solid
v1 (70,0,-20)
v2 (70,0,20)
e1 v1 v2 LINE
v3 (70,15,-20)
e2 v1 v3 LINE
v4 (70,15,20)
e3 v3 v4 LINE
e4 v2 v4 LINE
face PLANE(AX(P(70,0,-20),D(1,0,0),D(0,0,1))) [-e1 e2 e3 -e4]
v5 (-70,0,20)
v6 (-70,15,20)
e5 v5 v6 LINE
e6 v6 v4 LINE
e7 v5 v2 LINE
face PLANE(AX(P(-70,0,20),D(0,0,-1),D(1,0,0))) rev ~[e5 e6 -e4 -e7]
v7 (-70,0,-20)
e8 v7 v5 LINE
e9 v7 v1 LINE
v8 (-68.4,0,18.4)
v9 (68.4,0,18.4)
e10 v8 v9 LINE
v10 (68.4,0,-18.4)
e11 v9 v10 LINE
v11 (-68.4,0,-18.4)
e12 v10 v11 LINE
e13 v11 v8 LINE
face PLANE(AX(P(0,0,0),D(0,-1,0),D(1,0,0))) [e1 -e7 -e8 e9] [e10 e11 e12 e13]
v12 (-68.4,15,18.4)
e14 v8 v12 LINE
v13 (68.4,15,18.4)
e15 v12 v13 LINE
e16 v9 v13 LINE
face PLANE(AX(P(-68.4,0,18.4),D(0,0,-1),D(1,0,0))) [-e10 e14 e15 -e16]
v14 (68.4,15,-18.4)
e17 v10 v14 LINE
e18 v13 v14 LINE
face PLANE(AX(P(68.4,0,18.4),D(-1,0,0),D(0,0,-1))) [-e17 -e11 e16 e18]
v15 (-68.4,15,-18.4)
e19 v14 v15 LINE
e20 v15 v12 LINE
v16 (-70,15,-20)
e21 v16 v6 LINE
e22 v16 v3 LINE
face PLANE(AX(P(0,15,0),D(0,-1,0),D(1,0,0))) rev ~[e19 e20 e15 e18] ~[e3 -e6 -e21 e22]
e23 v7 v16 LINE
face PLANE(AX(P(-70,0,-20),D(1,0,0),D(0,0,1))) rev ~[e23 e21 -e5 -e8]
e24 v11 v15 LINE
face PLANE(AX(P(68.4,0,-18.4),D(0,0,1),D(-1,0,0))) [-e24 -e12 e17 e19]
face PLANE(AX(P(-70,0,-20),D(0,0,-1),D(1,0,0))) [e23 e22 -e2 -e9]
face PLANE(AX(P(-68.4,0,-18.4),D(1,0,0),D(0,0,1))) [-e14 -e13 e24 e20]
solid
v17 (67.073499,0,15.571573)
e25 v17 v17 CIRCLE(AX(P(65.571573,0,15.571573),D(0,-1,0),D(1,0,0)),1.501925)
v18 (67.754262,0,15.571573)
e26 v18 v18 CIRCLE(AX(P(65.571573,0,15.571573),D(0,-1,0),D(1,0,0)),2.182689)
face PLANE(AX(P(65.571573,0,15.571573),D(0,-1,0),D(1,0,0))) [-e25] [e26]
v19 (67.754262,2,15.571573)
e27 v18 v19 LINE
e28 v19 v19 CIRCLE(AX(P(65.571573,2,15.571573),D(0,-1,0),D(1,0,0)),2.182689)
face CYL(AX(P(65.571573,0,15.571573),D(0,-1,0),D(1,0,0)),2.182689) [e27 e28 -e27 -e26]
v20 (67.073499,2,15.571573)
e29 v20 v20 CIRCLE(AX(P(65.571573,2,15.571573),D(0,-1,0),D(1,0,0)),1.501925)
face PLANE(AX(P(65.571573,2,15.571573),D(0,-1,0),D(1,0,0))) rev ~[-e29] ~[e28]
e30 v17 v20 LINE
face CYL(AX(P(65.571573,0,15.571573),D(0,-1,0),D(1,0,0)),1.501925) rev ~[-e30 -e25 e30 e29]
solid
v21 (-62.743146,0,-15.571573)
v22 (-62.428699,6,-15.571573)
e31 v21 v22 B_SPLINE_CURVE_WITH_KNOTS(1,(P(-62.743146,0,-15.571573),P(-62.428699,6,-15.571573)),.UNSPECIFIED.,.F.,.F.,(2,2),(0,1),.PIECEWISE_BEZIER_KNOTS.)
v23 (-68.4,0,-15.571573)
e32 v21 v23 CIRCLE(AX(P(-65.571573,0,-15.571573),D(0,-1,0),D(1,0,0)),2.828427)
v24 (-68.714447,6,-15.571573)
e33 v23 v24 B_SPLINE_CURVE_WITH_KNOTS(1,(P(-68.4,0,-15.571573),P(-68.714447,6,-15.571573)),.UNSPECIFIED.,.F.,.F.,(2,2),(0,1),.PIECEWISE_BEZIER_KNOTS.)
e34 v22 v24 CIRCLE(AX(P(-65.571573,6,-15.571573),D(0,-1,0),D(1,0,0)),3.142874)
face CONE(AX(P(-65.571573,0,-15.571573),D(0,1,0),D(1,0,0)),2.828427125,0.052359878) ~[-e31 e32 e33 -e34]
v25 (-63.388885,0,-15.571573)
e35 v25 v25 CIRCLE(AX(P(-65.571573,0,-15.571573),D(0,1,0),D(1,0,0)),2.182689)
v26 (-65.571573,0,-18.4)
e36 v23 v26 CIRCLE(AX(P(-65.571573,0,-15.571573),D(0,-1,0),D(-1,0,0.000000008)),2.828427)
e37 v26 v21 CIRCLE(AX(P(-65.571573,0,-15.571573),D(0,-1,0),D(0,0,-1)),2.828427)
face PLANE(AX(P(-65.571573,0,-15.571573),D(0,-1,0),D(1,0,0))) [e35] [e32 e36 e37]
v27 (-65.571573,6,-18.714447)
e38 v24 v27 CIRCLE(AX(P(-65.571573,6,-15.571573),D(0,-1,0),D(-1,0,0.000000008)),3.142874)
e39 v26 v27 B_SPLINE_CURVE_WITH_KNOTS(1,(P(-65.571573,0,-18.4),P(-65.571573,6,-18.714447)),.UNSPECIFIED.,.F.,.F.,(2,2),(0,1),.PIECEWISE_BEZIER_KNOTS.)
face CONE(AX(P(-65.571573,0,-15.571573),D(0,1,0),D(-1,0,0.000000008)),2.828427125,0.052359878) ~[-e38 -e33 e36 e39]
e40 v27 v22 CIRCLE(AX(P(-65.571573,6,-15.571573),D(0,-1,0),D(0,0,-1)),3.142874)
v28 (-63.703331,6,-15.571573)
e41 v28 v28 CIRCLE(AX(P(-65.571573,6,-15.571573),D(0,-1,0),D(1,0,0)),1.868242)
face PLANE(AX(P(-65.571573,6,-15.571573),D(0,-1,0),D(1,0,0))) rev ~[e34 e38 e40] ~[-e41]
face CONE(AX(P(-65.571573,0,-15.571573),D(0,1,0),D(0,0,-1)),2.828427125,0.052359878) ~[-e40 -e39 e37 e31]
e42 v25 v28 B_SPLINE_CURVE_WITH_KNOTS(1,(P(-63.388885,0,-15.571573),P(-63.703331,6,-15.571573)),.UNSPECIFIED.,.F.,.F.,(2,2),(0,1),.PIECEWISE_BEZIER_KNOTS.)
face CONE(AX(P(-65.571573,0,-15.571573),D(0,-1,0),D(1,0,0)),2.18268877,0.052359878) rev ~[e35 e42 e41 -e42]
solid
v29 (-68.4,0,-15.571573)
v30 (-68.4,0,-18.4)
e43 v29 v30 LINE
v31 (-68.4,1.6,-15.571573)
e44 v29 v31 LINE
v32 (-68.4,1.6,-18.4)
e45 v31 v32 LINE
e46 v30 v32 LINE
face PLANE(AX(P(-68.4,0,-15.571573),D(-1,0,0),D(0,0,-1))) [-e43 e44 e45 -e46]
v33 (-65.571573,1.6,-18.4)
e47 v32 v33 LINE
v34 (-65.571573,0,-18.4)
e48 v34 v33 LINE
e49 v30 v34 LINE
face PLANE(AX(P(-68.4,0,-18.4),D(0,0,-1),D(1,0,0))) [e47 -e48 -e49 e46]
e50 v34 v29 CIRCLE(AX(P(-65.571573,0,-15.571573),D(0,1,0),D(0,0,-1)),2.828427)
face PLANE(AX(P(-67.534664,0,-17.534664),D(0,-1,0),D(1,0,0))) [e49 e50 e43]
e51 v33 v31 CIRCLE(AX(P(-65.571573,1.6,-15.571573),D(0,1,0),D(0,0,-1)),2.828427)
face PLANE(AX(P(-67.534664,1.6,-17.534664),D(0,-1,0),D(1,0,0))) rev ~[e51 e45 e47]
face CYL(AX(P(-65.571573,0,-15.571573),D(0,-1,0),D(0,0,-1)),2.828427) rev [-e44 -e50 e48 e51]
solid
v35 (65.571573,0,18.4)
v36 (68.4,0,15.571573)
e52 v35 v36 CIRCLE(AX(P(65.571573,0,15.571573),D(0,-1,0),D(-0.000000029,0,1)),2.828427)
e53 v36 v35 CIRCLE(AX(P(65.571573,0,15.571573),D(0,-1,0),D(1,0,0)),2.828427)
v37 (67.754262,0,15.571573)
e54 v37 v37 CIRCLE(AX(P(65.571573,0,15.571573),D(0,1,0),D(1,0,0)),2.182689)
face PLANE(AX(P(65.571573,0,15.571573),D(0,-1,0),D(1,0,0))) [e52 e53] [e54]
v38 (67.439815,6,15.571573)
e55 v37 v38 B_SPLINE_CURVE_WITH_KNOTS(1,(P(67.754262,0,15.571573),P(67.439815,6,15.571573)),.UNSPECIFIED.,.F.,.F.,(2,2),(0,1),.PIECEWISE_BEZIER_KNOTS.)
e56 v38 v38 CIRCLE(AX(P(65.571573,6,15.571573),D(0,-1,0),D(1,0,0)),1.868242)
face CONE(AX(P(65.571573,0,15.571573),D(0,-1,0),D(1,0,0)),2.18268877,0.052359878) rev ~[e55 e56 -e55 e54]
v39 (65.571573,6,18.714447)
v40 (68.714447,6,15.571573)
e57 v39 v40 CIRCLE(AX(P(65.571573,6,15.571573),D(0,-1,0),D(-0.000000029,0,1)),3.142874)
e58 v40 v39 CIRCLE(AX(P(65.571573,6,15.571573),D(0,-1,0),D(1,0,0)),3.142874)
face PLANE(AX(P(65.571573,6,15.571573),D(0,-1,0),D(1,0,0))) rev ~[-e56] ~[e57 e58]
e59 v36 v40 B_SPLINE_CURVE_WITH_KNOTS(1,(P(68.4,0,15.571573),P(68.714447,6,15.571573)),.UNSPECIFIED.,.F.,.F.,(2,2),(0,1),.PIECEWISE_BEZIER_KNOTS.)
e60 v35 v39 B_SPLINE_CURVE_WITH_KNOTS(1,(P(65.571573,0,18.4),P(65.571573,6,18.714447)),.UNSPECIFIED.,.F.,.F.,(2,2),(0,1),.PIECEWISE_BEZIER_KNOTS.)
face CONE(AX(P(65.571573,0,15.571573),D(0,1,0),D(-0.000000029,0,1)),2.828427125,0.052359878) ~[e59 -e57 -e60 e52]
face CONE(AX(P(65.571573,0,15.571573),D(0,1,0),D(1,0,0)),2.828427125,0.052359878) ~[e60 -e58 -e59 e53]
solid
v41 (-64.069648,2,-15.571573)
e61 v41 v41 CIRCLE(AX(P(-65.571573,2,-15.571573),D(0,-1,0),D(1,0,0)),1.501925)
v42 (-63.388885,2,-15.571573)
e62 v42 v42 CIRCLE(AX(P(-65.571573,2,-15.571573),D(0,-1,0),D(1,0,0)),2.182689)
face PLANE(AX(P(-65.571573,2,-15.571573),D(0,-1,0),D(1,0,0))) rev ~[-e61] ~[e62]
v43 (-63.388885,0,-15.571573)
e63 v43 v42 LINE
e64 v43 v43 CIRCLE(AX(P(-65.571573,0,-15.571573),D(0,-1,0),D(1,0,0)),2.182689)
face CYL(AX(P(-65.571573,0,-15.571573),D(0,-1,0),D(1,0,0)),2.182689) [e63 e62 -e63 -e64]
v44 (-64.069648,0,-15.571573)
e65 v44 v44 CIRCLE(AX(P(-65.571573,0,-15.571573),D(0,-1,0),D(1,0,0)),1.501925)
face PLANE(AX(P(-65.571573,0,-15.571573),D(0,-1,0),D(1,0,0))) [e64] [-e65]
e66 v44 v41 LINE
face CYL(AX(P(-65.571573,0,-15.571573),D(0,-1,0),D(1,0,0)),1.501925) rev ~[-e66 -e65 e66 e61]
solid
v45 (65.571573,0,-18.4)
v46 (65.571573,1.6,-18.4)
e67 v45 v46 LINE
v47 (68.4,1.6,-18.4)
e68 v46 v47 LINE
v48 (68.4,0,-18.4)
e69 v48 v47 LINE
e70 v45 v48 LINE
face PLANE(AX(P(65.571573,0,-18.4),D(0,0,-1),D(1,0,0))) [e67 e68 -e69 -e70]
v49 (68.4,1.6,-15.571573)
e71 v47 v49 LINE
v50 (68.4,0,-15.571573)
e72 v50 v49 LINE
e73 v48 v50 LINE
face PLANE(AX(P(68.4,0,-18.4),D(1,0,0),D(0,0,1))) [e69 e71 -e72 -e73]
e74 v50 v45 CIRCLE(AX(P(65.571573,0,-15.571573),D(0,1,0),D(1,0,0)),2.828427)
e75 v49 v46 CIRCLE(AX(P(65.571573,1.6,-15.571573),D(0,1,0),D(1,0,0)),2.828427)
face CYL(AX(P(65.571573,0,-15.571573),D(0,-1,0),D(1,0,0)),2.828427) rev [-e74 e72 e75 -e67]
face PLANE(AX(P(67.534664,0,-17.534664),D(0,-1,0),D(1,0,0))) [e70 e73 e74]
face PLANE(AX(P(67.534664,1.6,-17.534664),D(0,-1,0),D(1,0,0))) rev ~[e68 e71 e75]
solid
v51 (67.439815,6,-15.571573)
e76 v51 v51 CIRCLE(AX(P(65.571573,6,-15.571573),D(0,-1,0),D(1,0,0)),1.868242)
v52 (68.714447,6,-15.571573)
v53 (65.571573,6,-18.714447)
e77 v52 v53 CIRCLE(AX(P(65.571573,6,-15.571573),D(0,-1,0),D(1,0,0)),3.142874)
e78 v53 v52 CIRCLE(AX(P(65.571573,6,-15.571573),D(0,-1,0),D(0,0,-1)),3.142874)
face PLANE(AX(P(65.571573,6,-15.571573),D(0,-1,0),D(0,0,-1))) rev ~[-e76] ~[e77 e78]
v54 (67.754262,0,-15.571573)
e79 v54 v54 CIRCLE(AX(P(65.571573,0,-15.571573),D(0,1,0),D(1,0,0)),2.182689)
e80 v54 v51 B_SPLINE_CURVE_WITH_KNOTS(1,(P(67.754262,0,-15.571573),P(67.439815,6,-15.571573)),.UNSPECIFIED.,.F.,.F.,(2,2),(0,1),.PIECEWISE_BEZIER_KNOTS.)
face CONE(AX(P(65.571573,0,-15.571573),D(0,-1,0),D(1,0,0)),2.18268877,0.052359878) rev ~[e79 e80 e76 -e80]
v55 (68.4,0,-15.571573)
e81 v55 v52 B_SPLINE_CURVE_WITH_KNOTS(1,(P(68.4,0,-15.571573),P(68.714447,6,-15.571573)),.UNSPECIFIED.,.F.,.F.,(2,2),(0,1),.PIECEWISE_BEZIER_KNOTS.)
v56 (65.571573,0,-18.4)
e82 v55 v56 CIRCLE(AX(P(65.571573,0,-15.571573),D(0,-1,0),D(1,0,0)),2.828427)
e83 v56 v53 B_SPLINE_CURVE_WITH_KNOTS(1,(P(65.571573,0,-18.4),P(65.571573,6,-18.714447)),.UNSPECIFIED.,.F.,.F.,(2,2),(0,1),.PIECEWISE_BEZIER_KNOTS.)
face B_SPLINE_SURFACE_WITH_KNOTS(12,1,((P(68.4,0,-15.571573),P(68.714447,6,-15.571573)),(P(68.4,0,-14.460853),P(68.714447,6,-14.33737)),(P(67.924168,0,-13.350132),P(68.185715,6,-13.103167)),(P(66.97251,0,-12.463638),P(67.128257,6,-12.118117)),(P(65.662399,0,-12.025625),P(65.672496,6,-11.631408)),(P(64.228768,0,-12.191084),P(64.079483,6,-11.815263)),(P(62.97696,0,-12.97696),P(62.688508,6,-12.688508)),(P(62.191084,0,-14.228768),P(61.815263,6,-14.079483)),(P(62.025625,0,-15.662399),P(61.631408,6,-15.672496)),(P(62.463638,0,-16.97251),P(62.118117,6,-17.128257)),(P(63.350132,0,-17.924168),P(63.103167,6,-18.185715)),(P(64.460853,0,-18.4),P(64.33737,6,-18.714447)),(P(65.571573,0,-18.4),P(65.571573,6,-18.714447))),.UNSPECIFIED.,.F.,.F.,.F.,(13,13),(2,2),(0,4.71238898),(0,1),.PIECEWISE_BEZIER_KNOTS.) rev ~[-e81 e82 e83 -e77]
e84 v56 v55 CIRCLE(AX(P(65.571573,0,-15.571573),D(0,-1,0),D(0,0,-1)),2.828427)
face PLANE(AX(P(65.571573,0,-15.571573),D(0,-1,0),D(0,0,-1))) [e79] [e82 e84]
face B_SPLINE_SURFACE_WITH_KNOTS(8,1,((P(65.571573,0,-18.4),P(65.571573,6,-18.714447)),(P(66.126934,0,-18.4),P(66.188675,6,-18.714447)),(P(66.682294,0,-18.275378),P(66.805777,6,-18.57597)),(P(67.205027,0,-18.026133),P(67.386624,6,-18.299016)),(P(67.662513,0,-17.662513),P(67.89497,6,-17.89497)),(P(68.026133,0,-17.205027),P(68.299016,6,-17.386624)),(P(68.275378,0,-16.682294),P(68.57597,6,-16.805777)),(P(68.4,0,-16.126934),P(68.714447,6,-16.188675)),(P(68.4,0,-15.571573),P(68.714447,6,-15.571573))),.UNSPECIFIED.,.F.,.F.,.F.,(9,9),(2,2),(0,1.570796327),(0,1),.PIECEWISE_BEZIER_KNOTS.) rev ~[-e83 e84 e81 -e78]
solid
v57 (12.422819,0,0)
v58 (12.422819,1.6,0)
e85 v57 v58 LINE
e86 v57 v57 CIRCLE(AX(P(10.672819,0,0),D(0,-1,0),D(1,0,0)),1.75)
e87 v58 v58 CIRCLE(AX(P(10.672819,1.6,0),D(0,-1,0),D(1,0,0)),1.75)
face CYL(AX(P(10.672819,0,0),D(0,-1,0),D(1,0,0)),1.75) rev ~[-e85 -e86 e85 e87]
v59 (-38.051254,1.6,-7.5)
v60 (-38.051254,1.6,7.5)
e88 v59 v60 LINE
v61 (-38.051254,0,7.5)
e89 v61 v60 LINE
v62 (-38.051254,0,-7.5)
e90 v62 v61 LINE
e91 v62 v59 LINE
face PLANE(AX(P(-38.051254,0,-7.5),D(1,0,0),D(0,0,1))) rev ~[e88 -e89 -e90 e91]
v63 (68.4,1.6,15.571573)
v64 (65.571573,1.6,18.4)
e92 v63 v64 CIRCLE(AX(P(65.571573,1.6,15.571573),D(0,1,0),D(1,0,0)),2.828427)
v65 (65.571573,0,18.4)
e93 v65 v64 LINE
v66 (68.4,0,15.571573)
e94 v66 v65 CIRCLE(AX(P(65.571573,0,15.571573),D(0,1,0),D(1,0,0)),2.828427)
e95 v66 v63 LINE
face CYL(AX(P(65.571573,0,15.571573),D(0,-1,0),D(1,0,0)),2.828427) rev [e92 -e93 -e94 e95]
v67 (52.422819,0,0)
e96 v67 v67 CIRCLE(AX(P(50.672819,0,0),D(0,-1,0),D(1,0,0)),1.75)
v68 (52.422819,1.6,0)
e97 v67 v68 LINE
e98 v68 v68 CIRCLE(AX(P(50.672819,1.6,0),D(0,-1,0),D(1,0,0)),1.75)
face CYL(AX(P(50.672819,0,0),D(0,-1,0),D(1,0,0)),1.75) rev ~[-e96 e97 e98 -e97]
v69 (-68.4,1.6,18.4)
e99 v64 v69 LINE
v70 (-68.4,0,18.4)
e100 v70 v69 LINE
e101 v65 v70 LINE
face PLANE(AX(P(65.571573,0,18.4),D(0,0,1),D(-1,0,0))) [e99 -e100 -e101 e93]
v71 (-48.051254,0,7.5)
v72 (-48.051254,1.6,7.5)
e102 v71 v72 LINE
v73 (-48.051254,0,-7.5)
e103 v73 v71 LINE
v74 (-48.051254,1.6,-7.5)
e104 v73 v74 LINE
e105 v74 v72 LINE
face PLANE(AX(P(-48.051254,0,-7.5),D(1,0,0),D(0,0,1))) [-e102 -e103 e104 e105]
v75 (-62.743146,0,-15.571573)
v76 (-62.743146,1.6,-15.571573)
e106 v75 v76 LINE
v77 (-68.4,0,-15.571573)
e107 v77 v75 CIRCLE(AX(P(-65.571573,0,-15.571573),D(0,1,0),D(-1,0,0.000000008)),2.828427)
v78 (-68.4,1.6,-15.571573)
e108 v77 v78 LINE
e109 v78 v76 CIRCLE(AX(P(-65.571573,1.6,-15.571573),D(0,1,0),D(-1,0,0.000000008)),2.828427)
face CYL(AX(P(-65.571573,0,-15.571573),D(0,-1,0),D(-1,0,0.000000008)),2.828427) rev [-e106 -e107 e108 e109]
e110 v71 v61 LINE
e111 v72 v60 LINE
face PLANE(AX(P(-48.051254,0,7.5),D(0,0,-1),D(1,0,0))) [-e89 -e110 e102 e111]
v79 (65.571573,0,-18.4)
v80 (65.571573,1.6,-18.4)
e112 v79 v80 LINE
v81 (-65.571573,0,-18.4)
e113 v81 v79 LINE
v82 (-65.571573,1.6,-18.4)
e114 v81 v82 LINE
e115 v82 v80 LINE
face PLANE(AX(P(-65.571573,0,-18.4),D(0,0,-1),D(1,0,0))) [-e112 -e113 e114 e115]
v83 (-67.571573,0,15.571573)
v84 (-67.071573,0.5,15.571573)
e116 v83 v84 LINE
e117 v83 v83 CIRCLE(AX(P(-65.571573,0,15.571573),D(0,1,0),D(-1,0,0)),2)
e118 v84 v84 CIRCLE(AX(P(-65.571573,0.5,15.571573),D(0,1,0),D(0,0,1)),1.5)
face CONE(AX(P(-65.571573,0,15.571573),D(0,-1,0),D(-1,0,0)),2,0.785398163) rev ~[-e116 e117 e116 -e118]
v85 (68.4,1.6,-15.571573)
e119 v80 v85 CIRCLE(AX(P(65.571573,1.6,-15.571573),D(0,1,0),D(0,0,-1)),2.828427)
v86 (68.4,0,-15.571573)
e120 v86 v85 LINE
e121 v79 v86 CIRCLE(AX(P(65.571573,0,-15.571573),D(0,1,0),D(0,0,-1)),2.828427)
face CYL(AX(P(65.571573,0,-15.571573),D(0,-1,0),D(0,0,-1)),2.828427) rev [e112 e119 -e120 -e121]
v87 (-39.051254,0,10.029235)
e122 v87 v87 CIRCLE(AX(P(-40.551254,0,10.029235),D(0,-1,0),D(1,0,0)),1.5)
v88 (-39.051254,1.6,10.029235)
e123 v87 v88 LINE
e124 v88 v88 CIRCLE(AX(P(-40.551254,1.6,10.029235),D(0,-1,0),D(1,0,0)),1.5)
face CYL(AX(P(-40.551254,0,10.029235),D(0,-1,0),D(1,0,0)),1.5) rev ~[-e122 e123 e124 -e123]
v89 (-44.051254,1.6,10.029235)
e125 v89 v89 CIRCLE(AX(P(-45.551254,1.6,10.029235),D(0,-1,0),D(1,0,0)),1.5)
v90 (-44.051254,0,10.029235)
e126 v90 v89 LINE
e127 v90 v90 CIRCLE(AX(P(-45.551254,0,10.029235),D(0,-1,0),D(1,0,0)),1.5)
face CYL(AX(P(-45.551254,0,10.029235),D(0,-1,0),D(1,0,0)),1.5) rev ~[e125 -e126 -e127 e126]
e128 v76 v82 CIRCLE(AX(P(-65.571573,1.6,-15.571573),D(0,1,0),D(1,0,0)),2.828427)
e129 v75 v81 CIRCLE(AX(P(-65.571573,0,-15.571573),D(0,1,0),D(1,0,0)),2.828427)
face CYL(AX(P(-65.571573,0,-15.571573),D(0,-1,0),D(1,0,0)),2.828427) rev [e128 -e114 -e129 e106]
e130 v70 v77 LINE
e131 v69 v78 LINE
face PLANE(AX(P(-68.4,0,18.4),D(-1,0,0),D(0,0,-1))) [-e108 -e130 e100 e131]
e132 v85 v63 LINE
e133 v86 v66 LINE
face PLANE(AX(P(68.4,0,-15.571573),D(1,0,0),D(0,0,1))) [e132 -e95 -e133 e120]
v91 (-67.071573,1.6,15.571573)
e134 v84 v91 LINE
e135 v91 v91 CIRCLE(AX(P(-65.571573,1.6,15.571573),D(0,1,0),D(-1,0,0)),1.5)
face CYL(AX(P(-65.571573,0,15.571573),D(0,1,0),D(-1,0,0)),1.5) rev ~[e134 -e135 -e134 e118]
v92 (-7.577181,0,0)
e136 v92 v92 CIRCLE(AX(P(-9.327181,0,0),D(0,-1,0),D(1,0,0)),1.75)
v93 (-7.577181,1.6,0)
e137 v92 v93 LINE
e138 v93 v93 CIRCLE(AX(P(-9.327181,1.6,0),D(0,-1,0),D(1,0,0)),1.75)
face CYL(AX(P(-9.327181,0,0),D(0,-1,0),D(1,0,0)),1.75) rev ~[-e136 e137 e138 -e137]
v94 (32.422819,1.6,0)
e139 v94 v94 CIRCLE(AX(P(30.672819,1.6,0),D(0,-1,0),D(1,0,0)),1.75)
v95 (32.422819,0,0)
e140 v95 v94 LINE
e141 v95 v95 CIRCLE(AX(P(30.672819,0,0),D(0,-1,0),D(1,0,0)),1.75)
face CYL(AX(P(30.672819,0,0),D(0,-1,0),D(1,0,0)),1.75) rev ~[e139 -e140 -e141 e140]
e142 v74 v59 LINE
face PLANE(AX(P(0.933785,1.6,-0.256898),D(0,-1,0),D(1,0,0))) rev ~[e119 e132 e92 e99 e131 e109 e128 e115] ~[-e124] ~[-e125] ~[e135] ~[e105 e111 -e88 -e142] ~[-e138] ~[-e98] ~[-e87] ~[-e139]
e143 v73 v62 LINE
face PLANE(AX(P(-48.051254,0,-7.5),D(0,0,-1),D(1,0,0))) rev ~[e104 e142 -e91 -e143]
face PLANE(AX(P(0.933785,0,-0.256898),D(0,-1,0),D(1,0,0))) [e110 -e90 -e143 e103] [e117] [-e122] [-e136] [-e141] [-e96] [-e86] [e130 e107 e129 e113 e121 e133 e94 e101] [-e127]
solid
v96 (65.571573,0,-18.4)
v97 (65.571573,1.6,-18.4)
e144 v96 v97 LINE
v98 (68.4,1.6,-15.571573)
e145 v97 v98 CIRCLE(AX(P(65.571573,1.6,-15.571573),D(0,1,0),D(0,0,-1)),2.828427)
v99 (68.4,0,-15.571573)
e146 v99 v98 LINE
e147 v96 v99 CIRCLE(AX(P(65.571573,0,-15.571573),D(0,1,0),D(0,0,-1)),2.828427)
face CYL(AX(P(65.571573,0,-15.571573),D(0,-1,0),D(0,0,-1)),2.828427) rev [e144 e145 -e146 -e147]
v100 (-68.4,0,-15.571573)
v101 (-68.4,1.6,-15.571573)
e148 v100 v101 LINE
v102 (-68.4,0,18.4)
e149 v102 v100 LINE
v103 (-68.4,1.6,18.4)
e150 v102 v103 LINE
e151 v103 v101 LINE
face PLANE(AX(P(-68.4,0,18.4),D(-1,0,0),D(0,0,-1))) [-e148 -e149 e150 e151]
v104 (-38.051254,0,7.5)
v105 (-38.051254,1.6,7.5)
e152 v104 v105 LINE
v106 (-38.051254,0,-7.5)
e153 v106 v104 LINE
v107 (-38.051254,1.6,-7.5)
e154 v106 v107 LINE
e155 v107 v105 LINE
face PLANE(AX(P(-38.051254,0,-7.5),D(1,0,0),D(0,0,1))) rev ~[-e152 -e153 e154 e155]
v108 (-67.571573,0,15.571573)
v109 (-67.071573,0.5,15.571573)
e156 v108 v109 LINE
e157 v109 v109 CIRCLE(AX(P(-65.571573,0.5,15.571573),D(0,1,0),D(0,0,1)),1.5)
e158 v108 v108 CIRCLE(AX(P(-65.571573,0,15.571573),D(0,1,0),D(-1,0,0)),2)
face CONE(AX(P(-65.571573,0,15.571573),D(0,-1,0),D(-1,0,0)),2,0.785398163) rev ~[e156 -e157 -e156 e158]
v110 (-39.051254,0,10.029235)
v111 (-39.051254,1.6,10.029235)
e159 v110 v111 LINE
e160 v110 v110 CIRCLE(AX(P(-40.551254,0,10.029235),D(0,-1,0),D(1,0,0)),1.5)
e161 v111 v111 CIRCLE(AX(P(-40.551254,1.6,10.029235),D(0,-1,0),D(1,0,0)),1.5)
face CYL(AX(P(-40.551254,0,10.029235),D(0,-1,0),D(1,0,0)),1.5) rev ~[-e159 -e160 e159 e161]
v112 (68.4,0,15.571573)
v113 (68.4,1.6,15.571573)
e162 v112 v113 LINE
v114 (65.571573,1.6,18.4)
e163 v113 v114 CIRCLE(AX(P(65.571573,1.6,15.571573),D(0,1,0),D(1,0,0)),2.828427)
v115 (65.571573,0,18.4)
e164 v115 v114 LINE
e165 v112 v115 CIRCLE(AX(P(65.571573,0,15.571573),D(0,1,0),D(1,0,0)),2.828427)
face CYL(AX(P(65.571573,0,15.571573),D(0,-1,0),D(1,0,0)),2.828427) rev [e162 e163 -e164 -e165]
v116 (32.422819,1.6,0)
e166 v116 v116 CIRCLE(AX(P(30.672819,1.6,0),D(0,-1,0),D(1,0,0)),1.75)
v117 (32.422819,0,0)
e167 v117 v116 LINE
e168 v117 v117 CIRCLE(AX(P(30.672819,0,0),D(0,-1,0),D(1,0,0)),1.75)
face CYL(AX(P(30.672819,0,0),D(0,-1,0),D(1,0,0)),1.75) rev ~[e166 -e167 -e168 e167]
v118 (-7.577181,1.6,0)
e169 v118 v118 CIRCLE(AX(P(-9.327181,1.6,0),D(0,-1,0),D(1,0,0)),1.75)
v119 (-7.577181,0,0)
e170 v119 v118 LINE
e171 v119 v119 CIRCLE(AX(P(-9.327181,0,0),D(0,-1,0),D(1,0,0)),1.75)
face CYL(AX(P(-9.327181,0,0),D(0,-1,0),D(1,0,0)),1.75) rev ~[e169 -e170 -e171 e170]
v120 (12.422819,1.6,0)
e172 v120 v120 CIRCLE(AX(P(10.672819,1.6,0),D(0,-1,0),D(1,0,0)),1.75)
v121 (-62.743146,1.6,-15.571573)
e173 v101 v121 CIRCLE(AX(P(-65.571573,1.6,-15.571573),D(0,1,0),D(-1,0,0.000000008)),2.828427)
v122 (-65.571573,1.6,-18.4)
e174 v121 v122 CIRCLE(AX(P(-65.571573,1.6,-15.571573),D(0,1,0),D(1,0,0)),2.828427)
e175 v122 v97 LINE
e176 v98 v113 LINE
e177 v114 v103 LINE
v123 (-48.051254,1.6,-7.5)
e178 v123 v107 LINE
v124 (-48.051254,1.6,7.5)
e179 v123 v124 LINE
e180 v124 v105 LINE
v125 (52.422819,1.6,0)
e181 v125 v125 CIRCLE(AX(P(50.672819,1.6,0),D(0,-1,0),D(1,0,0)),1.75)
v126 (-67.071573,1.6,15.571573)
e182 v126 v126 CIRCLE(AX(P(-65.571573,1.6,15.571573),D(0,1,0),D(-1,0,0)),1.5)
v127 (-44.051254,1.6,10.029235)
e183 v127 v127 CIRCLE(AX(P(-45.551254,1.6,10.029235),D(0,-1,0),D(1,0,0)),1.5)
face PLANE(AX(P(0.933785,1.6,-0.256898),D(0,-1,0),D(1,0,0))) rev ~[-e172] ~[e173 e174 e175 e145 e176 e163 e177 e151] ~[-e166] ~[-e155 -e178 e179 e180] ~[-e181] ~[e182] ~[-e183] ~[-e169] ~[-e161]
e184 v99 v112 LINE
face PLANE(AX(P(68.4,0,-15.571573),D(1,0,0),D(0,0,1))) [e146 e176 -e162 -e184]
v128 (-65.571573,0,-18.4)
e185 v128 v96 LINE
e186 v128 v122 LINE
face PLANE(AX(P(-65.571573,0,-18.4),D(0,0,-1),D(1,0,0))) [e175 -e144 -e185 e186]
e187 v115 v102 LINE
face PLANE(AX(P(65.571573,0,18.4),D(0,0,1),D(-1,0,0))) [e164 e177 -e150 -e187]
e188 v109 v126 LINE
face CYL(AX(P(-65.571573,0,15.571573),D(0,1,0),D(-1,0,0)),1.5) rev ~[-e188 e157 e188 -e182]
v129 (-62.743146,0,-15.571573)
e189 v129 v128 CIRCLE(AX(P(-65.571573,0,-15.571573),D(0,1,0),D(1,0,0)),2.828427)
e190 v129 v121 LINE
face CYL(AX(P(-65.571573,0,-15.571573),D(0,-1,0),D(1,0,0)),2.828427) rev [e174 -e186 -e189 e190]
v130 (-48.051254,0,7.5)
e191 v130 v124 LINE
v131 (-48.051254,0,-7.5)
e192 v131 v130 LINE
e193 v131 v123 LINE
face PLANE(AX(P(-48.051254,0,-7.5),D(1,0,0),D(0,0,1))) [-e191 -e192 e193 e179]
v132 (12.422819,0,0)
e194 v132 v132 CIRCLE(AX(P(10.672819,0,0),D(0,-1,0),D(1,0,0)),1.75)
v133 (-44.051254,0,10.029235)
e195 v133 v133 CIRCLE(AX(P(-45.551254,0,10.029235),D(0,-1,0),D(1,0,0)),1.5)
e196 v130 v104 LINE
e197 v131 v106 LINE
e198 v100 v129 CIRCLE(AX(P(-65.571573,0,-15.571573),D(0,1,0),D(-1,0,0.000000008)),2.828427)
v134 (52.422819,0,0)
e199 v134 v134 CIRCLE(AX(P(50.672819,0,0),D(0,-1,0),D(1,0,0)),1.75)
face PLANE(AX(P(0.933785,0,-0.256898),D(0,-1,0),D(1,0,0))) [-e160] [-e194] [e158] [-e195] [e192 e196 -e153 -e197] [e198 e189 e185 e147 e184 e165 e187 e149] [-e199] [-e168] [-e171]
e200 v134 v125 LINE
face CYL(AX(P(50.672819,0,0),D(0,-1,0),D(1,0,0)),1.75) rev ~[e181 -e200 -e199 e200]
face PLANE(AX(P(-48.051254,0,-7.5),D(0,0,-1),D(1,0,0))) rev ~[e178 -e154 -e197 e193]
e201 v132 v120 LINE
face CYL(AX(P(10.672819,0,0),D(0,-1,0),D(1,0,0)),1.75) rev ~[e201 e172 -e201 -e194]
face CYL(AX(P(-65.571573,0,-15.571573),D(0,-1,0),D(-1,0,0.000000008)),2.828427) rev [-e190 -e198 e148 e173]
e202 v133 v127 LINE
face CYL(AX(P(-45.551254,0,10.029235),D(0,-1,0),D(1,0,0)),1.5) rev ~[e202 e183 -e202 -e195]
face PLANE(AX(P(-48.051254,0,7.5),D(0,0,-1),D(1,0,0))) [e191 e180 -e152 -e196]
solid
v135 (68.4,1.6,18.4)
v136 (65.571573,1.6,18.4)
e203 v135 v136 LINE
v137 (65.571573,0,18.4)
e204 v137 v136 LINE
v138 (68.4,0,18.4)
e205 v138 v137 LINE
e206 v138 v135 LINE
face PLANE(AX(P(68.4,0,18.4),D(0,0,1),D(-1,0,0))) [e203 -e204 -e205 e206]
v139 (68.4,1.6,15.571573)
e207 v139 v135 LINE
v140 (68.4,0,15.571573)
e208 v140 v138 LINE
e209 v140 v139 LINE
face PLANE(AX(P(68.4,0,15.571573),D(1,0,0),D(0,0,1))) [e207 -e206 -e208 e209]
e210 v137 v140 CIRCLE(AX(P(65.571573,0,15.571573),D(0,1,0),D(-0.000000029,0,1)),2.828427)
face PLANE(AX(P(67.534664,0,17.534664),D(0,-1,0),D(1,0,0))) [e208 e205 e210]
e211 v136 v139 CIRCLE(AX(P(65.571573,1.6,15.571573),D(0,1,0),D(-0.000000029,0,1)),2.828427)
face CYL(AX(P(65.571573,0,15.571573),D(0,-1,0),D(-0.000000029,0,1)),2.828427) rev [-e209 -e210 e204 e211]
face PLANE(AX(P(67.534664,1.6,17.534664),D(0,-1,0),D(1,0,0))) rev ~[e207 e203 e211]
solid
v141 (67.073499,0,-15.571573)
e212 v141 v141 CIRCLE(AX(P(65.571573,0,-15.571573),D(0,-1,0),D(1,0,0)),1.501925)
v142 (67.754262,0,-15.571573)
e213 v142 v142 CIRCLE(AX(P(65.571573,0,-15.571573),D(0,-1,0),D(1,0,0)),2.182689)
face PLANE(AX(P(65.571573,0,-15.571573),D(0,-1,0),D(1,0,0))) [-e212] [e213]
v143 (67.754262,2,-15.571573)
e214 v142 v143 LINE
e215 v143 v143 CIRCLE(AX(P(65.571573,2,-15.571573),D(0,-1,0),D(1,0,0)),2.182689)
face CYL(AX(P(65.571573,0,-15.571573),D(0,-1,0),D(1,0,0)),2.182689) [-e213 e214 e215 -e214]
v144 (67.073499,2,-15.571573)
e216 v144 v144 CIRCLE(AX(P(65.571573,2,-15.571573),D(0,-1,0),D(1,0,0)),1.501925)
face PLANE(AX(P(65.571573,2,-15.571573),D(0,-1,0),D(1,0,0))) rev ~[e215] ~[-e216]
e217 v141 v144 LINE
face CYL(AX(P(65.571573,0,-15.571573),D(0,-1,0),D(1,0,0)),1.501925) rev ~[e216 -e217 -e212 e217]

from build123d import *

# Parameters (mm, degrees)
F0_W             = 10
F0_H             = 15
F0_R             = 1.75
F0_R_2           = 1.5
F1_DEPTH         = 1.6
F0_W_2           = 140
F0_H_2           = 40
F2_DEPTH         = 15
F3_DEPTH         = 1.6
F0_R_3           = 2.1826887697
F4_DEPTH         = 6
F4_TAPER         = -3
F0_R_4           = 1.5019252968
F5_DEPTH         = 2
F6_D             = 3
F6_CSINK_D       = 4
F6_CSINK_ANGLE   = 90
F6_2_D           = 3
F6_2_CSINK_D     = 4
F6_2_CSINK_ANGLE = 90


# Not quite as in the source:
# - a feature names something its author has since deleted; it is built from what else it names


with BuildPart() as f1:
    # F0 (on Front) → F1 (new body)
    with BuildSketch(Plane.XZ):
        with BuildLine():
            Line((65.5715732005, 18.4000004083), (-68.4000004083, 18.4000004083))
            Line((-68.4000004083, 18.4000004083), (-68.4000004083, -15.5715732606))
            ThreePointArc((-68.4000004083, -15.5715732606), (-65.5715732721, -12.7431461588), (-62.7431461588, -15.5715732835))
            ThreePointArc((-62.7431461588, -15.5715732835), (-63.5715732835, -17.5715732835), (-65.5715732835, -18.4000004083))
            Line((-65.5715732835, -18.4000004083), (65.5715732835, -18.4000004083))
            ThreePointArc((65.5715732835, -18.4000004083), (63.5715732835, -13.5715732835), (68.4000004083, -15.5715732835))
            Line((68.4000004083, -15.5715732835), (68.4000004083, 15.5715732835))
            ThreePointArc((68.4000004083, 15.5715732835), (63.5715733129, 13.5715732542), (65.5715732005, 18.4000004083))
        make_face()
        with Locations((-43.0512540042, 0)):
            Rectangle(F0_W, F0_H, mode=Mode.SUBTRACT)
        with Locations((-9.3271806836, 0)):
            Circle(F0_R, mode=Mode.SUBTRACT)
        with Locations((-45.5512540042, 10.0292349234)):
            Circle(F0_R_2, mode=Mode.SUBTRACT)
        with Locations((-40.5512540042, 10.0292349234)):
            Circle(F0_R_2, mode=Mode.SUBTRACT)
        with Locations((10.6728193164, 0)):
            Circle(F0_R, mode=Mode.SUBTRACT)
        with Locations((30.6728193164, 0)):
            Circle(F0_R, mode=Mode.SUBTRACT)
        with Locations((50.6728193164, 0)):
            Circle(F0_R, mode=Mode.SUBTRACT)
    extrude(amount=-F1_DEPTH)

    # F6 (through all)
    with Locations(Plane.XZ):
        with Locations((-65.5715732835, 15.5715732835)):
            CounterSinkHole(F6_D / 2, F6_CSINK_D / 2, counter_sink_angle=F6_CSINK_ANGLE)


with BuildPart() as f2:
    # F0 (on Front) → F2 (new body)
    with BuildSketch(Plane.XZ):
        Rectangle(F0_W_2, F0_H_2)
        Polygon((-68.4000004083, -15.5715732606), (-68.4000004083, 18.4000004083), (65.5715732005, 18.4000004083), (68.4000004083, 18.4000004083), (68.4000004083, 15.5715732835), (68.4000004083, -15.5715732835), (68.4000004083, -18.4000004083), (65.5715732835, -18.4000004083), (-65.5715732835, -18.4000004083), (-68.4000004083, -18.4000004083), align=None, mode=Mode.SUBTRACT)
    extrude(amount=-F2_DEPTH)


with BuildPart() as f3:
    # F0 (on Front) → F3 (new body)
    with BuildSketch(Plane.XZ):
        with BuildLine():
            Line((65.5715732005, 18.4000004083), (-68.4000004083, 18.4000004083))
            Line((-68.4000004083, 18.4000004083), (-68.4000004083, -15.5715732606))
            ThreePointArc((-68.4000004083, -15.5715732606), (-65.5715732721, -12.7431461588), (-62.7431461588, -15.5715732835))
            ThreePointArc((-62.7431461588, -15.5715732835), (-63.5715732835, -17.5715732835), (-65.5715732835, -18.4000004083))
            Line((-65.5715732835, -18.4000004083), (65.5715732835, -18.4000004083))
            ThreePointArc((65.5715732835, -18.4000004083), (63.5715732835, -13.5715732835), (68.4000004083, -15.5715732835))
            Line((68.4000004083, -15.5715732835), (68.4000004083, 15.5715732835))
            ThreePointArc((68.4000004083, 15.5715732835), (63.5715733129, 13.5715732542), (65.5715732005, 18.4000004083))
        make_face()
        with Locations((-43.0512540042, 0)):
            Rectangle(F0_W, F0_H, mode=Mode.SUBTRACT)
        with Locations((-9.3271806836, 0)):
            Circle(F0_R, mode=Mode.SUBTRACT)
        with Locations((-45.5512540042, 10.0292349234)):
            Circle(F0_R_2, mode=Mode.SUBTRACT)
        with Locations((-40.5512540042, 10.0292349234)):
            Circle(F0_R_2, mode=Mode.SUBTRACT)
        with Locations((10.6728193164, 0)):
            Circle(F0_R, mode=Mode.SUBTRACT)
        with Locations((30.6728193164, 0)):
            Circle(F0_R, mode=Mode.SUBTRACT)
        with Locations((50.6728193164, 0)):
            Circle(F0_R, mode=Mode.SUBTRACT)
    extrude(amount=-F3_DEPTH)

    # F6#2 (through all)
    with Locations(Plane.XZ):
        with Locations((-65.5715732835, 15.5715732835)):
            CounterSinkHole(F6_2_D / 2, F6_2_CSINK_D / 2, counter_sink_angle=F6_2_CSINK_ANGLE)


with BuildPart() as f3b:
    # F0 (on Front) → F3, piece 2 (new body)
    with BuildSketch(Plane.XZ):
        with BuildLine():
            ThreePointArc((-65.5715732835, -18.4000004083), (-67.5715732917, -17.5715732754), (-68.4000004083, -15.5715732606))
            Line((-68.4000004083, -15.5715732606), (-68.4000004083, -18.4000004083))
            Line((-68.4000004083, -18.4000004083), (-65.5715732835, -18.4000004083))
        make_face()
    extrude(amount=-F3_DEPTH)


with BuildPart() as f3c:
    # F0 (on Front) → F3, piece 3 (new body)
    with BuildSketch(Plane.XZ):
        with BuildLine():
            Line((68.4000004083, -18.4000004083), (68.4000004083, -15.5715732835))
            ThreePointArc((68.4000004083, -15.5715732835), (67.5715732835, -17.5715732835), (65.5715732835, -18.4000004083))
            Line((65.5715732835, -18.4000004083), (68.4000004083, -18.4000004083))
        make_face()
    extrude(amount=-F3_DEPTH)


with BuildPart() as f3d:
    # F0 (on Front) → F3, piece 4 (new body)
    with BuildSketch(Plane.XZ):
        with BuildLine():
            Line((68.4000004083, 18.4000004083), (65.5715732005, 18.4000004083))
            ThreePointArc((65.5715732005, 18.4000004083), (67.5715732542, 17.5715733129), (68.4000004083, 15.5715732835))
            Line((68.4000004083, 15.5715732835), (68.4000004083, 18.4000004083))
        make_face()
    extrude(amount=-F3_DEPTH)


with BuildPart() as f4:
    # F0 (on Front) → F4 (new body)
    with BuildSketch(Plane.XZ):
        with BuildLine():
            ThreePointArc((68.4000004083, 15.5715732835), (67.5715732542, 17.5715733129), (65.5715732005, 18.4000004083))
            ThreePointArc((65.5715732005, 18.4000004083), (63.5715733129, 13.5715732542), (68.4000004083, 15.5715732835))
        make_face()
        with Locations((65.5715732835, 15.5715732835)):
            Circle(F0_R_3, mode=Mode.SUBTRACT)
    extrude(amount=-F4_DEPTH, taper=F4_TAPER)


with BuildPart() as f4b:
    # F0 (on Front) → F4, piece 2 (new body)
    with BuildSketch(Plane.XZ):
        with BuildLine():
            ThreePointArc((65.5715732835, -18.4000004083), (67.5715732835, -17.5715732835), (68.4000004083, -15.5715732835))
            ThreePointArc((68.4000004083, -15.5715732835), (63.5715732835, -13.5715732835), (65.5715732835, -18.4000004083))
        make_face()
        with Locations((65.5715732835, -15.5715732835)):
            Circle(F0_R_3, mode=Mode.SUBTRACT)
    extrude(amount=-F4_DEPTH, taper=F4_TAPER)


with BuildPart() as f4c:
    # F0 (on Front) → F4, piece 3 (new body)
    with BuildSketch(Plane.XZ):
        with BuildLine():
            ThreePointArc((-62.7431461588, -15.5715732835), (-65.5715732721, -12.7431461588), (-68.4000004083, -15.5715732606))
            ThreePointArc((-68.4000004083, -15.5715732606), (-67.5715732917, -17.5715732754), (-65.5715732835, -18.4000004083))
            ThreePointArc((-65.5715732835, -18.4000004083), (-63.5715732835, -17.5715732835), (-62.7431461588, -15.5715732835))
        make_face()
        with Locations((-65.5715732835, -15.5715732835)):
            Circle(F0_R_3, mode=Mode.SUBTRACT)
    extrude(amount=-F4_DEPTH, taper=F4_TAPER)


with BuildPart() as f5:
    # F0 (on Front) → F5 (new body)
    with BuildSketch(Plane.XZ):
        with Locations((65.5715732835, 15.5715732835)):
            Circle(F0_R_3)
        with Locations((65.5715732835, 15.5715732835)):
            Circle(F0_R_4, mode=Mode.SUBTRACT)
    extrude(amount=-F5_DEPTH)


with BuildPart() as f5b:
    # F0 (on Front) → F5, piece 2 (new body)
    with BuildSketch(Plane.XZ):
        with Locations((65.5715732835, -15.5715732835)):
            Circle(F0_R_3)
        with Locations((65.5715732835, -15.5715732835)):
            Circle(F0_R_4, mode=Mode.SUBTRACT)
    extrude(amount=-F5_DEPTH)


with BuildPart() as f5c:
    # F0 (on Front) → F5, piece 3 (new body)
    with BuildSketch(Plane.XZ):
        with Locations((-65.5715732835, -15.5715732835)):
            Circle(F0_R_3)
        with Locations((-65.5715732835, -15.5715732835)):
            Circle(F0_R_4, mode=Mode.SUBTRACT)
    extrude(amount=-F5_DEPTH)


solid = Compound([f1.part, f2.part, f3.part, f3b.part, f3c.part, f3d.part, f4.part, f4b.part, f4c.part, f5.part, f5b.part, f5c.part])
